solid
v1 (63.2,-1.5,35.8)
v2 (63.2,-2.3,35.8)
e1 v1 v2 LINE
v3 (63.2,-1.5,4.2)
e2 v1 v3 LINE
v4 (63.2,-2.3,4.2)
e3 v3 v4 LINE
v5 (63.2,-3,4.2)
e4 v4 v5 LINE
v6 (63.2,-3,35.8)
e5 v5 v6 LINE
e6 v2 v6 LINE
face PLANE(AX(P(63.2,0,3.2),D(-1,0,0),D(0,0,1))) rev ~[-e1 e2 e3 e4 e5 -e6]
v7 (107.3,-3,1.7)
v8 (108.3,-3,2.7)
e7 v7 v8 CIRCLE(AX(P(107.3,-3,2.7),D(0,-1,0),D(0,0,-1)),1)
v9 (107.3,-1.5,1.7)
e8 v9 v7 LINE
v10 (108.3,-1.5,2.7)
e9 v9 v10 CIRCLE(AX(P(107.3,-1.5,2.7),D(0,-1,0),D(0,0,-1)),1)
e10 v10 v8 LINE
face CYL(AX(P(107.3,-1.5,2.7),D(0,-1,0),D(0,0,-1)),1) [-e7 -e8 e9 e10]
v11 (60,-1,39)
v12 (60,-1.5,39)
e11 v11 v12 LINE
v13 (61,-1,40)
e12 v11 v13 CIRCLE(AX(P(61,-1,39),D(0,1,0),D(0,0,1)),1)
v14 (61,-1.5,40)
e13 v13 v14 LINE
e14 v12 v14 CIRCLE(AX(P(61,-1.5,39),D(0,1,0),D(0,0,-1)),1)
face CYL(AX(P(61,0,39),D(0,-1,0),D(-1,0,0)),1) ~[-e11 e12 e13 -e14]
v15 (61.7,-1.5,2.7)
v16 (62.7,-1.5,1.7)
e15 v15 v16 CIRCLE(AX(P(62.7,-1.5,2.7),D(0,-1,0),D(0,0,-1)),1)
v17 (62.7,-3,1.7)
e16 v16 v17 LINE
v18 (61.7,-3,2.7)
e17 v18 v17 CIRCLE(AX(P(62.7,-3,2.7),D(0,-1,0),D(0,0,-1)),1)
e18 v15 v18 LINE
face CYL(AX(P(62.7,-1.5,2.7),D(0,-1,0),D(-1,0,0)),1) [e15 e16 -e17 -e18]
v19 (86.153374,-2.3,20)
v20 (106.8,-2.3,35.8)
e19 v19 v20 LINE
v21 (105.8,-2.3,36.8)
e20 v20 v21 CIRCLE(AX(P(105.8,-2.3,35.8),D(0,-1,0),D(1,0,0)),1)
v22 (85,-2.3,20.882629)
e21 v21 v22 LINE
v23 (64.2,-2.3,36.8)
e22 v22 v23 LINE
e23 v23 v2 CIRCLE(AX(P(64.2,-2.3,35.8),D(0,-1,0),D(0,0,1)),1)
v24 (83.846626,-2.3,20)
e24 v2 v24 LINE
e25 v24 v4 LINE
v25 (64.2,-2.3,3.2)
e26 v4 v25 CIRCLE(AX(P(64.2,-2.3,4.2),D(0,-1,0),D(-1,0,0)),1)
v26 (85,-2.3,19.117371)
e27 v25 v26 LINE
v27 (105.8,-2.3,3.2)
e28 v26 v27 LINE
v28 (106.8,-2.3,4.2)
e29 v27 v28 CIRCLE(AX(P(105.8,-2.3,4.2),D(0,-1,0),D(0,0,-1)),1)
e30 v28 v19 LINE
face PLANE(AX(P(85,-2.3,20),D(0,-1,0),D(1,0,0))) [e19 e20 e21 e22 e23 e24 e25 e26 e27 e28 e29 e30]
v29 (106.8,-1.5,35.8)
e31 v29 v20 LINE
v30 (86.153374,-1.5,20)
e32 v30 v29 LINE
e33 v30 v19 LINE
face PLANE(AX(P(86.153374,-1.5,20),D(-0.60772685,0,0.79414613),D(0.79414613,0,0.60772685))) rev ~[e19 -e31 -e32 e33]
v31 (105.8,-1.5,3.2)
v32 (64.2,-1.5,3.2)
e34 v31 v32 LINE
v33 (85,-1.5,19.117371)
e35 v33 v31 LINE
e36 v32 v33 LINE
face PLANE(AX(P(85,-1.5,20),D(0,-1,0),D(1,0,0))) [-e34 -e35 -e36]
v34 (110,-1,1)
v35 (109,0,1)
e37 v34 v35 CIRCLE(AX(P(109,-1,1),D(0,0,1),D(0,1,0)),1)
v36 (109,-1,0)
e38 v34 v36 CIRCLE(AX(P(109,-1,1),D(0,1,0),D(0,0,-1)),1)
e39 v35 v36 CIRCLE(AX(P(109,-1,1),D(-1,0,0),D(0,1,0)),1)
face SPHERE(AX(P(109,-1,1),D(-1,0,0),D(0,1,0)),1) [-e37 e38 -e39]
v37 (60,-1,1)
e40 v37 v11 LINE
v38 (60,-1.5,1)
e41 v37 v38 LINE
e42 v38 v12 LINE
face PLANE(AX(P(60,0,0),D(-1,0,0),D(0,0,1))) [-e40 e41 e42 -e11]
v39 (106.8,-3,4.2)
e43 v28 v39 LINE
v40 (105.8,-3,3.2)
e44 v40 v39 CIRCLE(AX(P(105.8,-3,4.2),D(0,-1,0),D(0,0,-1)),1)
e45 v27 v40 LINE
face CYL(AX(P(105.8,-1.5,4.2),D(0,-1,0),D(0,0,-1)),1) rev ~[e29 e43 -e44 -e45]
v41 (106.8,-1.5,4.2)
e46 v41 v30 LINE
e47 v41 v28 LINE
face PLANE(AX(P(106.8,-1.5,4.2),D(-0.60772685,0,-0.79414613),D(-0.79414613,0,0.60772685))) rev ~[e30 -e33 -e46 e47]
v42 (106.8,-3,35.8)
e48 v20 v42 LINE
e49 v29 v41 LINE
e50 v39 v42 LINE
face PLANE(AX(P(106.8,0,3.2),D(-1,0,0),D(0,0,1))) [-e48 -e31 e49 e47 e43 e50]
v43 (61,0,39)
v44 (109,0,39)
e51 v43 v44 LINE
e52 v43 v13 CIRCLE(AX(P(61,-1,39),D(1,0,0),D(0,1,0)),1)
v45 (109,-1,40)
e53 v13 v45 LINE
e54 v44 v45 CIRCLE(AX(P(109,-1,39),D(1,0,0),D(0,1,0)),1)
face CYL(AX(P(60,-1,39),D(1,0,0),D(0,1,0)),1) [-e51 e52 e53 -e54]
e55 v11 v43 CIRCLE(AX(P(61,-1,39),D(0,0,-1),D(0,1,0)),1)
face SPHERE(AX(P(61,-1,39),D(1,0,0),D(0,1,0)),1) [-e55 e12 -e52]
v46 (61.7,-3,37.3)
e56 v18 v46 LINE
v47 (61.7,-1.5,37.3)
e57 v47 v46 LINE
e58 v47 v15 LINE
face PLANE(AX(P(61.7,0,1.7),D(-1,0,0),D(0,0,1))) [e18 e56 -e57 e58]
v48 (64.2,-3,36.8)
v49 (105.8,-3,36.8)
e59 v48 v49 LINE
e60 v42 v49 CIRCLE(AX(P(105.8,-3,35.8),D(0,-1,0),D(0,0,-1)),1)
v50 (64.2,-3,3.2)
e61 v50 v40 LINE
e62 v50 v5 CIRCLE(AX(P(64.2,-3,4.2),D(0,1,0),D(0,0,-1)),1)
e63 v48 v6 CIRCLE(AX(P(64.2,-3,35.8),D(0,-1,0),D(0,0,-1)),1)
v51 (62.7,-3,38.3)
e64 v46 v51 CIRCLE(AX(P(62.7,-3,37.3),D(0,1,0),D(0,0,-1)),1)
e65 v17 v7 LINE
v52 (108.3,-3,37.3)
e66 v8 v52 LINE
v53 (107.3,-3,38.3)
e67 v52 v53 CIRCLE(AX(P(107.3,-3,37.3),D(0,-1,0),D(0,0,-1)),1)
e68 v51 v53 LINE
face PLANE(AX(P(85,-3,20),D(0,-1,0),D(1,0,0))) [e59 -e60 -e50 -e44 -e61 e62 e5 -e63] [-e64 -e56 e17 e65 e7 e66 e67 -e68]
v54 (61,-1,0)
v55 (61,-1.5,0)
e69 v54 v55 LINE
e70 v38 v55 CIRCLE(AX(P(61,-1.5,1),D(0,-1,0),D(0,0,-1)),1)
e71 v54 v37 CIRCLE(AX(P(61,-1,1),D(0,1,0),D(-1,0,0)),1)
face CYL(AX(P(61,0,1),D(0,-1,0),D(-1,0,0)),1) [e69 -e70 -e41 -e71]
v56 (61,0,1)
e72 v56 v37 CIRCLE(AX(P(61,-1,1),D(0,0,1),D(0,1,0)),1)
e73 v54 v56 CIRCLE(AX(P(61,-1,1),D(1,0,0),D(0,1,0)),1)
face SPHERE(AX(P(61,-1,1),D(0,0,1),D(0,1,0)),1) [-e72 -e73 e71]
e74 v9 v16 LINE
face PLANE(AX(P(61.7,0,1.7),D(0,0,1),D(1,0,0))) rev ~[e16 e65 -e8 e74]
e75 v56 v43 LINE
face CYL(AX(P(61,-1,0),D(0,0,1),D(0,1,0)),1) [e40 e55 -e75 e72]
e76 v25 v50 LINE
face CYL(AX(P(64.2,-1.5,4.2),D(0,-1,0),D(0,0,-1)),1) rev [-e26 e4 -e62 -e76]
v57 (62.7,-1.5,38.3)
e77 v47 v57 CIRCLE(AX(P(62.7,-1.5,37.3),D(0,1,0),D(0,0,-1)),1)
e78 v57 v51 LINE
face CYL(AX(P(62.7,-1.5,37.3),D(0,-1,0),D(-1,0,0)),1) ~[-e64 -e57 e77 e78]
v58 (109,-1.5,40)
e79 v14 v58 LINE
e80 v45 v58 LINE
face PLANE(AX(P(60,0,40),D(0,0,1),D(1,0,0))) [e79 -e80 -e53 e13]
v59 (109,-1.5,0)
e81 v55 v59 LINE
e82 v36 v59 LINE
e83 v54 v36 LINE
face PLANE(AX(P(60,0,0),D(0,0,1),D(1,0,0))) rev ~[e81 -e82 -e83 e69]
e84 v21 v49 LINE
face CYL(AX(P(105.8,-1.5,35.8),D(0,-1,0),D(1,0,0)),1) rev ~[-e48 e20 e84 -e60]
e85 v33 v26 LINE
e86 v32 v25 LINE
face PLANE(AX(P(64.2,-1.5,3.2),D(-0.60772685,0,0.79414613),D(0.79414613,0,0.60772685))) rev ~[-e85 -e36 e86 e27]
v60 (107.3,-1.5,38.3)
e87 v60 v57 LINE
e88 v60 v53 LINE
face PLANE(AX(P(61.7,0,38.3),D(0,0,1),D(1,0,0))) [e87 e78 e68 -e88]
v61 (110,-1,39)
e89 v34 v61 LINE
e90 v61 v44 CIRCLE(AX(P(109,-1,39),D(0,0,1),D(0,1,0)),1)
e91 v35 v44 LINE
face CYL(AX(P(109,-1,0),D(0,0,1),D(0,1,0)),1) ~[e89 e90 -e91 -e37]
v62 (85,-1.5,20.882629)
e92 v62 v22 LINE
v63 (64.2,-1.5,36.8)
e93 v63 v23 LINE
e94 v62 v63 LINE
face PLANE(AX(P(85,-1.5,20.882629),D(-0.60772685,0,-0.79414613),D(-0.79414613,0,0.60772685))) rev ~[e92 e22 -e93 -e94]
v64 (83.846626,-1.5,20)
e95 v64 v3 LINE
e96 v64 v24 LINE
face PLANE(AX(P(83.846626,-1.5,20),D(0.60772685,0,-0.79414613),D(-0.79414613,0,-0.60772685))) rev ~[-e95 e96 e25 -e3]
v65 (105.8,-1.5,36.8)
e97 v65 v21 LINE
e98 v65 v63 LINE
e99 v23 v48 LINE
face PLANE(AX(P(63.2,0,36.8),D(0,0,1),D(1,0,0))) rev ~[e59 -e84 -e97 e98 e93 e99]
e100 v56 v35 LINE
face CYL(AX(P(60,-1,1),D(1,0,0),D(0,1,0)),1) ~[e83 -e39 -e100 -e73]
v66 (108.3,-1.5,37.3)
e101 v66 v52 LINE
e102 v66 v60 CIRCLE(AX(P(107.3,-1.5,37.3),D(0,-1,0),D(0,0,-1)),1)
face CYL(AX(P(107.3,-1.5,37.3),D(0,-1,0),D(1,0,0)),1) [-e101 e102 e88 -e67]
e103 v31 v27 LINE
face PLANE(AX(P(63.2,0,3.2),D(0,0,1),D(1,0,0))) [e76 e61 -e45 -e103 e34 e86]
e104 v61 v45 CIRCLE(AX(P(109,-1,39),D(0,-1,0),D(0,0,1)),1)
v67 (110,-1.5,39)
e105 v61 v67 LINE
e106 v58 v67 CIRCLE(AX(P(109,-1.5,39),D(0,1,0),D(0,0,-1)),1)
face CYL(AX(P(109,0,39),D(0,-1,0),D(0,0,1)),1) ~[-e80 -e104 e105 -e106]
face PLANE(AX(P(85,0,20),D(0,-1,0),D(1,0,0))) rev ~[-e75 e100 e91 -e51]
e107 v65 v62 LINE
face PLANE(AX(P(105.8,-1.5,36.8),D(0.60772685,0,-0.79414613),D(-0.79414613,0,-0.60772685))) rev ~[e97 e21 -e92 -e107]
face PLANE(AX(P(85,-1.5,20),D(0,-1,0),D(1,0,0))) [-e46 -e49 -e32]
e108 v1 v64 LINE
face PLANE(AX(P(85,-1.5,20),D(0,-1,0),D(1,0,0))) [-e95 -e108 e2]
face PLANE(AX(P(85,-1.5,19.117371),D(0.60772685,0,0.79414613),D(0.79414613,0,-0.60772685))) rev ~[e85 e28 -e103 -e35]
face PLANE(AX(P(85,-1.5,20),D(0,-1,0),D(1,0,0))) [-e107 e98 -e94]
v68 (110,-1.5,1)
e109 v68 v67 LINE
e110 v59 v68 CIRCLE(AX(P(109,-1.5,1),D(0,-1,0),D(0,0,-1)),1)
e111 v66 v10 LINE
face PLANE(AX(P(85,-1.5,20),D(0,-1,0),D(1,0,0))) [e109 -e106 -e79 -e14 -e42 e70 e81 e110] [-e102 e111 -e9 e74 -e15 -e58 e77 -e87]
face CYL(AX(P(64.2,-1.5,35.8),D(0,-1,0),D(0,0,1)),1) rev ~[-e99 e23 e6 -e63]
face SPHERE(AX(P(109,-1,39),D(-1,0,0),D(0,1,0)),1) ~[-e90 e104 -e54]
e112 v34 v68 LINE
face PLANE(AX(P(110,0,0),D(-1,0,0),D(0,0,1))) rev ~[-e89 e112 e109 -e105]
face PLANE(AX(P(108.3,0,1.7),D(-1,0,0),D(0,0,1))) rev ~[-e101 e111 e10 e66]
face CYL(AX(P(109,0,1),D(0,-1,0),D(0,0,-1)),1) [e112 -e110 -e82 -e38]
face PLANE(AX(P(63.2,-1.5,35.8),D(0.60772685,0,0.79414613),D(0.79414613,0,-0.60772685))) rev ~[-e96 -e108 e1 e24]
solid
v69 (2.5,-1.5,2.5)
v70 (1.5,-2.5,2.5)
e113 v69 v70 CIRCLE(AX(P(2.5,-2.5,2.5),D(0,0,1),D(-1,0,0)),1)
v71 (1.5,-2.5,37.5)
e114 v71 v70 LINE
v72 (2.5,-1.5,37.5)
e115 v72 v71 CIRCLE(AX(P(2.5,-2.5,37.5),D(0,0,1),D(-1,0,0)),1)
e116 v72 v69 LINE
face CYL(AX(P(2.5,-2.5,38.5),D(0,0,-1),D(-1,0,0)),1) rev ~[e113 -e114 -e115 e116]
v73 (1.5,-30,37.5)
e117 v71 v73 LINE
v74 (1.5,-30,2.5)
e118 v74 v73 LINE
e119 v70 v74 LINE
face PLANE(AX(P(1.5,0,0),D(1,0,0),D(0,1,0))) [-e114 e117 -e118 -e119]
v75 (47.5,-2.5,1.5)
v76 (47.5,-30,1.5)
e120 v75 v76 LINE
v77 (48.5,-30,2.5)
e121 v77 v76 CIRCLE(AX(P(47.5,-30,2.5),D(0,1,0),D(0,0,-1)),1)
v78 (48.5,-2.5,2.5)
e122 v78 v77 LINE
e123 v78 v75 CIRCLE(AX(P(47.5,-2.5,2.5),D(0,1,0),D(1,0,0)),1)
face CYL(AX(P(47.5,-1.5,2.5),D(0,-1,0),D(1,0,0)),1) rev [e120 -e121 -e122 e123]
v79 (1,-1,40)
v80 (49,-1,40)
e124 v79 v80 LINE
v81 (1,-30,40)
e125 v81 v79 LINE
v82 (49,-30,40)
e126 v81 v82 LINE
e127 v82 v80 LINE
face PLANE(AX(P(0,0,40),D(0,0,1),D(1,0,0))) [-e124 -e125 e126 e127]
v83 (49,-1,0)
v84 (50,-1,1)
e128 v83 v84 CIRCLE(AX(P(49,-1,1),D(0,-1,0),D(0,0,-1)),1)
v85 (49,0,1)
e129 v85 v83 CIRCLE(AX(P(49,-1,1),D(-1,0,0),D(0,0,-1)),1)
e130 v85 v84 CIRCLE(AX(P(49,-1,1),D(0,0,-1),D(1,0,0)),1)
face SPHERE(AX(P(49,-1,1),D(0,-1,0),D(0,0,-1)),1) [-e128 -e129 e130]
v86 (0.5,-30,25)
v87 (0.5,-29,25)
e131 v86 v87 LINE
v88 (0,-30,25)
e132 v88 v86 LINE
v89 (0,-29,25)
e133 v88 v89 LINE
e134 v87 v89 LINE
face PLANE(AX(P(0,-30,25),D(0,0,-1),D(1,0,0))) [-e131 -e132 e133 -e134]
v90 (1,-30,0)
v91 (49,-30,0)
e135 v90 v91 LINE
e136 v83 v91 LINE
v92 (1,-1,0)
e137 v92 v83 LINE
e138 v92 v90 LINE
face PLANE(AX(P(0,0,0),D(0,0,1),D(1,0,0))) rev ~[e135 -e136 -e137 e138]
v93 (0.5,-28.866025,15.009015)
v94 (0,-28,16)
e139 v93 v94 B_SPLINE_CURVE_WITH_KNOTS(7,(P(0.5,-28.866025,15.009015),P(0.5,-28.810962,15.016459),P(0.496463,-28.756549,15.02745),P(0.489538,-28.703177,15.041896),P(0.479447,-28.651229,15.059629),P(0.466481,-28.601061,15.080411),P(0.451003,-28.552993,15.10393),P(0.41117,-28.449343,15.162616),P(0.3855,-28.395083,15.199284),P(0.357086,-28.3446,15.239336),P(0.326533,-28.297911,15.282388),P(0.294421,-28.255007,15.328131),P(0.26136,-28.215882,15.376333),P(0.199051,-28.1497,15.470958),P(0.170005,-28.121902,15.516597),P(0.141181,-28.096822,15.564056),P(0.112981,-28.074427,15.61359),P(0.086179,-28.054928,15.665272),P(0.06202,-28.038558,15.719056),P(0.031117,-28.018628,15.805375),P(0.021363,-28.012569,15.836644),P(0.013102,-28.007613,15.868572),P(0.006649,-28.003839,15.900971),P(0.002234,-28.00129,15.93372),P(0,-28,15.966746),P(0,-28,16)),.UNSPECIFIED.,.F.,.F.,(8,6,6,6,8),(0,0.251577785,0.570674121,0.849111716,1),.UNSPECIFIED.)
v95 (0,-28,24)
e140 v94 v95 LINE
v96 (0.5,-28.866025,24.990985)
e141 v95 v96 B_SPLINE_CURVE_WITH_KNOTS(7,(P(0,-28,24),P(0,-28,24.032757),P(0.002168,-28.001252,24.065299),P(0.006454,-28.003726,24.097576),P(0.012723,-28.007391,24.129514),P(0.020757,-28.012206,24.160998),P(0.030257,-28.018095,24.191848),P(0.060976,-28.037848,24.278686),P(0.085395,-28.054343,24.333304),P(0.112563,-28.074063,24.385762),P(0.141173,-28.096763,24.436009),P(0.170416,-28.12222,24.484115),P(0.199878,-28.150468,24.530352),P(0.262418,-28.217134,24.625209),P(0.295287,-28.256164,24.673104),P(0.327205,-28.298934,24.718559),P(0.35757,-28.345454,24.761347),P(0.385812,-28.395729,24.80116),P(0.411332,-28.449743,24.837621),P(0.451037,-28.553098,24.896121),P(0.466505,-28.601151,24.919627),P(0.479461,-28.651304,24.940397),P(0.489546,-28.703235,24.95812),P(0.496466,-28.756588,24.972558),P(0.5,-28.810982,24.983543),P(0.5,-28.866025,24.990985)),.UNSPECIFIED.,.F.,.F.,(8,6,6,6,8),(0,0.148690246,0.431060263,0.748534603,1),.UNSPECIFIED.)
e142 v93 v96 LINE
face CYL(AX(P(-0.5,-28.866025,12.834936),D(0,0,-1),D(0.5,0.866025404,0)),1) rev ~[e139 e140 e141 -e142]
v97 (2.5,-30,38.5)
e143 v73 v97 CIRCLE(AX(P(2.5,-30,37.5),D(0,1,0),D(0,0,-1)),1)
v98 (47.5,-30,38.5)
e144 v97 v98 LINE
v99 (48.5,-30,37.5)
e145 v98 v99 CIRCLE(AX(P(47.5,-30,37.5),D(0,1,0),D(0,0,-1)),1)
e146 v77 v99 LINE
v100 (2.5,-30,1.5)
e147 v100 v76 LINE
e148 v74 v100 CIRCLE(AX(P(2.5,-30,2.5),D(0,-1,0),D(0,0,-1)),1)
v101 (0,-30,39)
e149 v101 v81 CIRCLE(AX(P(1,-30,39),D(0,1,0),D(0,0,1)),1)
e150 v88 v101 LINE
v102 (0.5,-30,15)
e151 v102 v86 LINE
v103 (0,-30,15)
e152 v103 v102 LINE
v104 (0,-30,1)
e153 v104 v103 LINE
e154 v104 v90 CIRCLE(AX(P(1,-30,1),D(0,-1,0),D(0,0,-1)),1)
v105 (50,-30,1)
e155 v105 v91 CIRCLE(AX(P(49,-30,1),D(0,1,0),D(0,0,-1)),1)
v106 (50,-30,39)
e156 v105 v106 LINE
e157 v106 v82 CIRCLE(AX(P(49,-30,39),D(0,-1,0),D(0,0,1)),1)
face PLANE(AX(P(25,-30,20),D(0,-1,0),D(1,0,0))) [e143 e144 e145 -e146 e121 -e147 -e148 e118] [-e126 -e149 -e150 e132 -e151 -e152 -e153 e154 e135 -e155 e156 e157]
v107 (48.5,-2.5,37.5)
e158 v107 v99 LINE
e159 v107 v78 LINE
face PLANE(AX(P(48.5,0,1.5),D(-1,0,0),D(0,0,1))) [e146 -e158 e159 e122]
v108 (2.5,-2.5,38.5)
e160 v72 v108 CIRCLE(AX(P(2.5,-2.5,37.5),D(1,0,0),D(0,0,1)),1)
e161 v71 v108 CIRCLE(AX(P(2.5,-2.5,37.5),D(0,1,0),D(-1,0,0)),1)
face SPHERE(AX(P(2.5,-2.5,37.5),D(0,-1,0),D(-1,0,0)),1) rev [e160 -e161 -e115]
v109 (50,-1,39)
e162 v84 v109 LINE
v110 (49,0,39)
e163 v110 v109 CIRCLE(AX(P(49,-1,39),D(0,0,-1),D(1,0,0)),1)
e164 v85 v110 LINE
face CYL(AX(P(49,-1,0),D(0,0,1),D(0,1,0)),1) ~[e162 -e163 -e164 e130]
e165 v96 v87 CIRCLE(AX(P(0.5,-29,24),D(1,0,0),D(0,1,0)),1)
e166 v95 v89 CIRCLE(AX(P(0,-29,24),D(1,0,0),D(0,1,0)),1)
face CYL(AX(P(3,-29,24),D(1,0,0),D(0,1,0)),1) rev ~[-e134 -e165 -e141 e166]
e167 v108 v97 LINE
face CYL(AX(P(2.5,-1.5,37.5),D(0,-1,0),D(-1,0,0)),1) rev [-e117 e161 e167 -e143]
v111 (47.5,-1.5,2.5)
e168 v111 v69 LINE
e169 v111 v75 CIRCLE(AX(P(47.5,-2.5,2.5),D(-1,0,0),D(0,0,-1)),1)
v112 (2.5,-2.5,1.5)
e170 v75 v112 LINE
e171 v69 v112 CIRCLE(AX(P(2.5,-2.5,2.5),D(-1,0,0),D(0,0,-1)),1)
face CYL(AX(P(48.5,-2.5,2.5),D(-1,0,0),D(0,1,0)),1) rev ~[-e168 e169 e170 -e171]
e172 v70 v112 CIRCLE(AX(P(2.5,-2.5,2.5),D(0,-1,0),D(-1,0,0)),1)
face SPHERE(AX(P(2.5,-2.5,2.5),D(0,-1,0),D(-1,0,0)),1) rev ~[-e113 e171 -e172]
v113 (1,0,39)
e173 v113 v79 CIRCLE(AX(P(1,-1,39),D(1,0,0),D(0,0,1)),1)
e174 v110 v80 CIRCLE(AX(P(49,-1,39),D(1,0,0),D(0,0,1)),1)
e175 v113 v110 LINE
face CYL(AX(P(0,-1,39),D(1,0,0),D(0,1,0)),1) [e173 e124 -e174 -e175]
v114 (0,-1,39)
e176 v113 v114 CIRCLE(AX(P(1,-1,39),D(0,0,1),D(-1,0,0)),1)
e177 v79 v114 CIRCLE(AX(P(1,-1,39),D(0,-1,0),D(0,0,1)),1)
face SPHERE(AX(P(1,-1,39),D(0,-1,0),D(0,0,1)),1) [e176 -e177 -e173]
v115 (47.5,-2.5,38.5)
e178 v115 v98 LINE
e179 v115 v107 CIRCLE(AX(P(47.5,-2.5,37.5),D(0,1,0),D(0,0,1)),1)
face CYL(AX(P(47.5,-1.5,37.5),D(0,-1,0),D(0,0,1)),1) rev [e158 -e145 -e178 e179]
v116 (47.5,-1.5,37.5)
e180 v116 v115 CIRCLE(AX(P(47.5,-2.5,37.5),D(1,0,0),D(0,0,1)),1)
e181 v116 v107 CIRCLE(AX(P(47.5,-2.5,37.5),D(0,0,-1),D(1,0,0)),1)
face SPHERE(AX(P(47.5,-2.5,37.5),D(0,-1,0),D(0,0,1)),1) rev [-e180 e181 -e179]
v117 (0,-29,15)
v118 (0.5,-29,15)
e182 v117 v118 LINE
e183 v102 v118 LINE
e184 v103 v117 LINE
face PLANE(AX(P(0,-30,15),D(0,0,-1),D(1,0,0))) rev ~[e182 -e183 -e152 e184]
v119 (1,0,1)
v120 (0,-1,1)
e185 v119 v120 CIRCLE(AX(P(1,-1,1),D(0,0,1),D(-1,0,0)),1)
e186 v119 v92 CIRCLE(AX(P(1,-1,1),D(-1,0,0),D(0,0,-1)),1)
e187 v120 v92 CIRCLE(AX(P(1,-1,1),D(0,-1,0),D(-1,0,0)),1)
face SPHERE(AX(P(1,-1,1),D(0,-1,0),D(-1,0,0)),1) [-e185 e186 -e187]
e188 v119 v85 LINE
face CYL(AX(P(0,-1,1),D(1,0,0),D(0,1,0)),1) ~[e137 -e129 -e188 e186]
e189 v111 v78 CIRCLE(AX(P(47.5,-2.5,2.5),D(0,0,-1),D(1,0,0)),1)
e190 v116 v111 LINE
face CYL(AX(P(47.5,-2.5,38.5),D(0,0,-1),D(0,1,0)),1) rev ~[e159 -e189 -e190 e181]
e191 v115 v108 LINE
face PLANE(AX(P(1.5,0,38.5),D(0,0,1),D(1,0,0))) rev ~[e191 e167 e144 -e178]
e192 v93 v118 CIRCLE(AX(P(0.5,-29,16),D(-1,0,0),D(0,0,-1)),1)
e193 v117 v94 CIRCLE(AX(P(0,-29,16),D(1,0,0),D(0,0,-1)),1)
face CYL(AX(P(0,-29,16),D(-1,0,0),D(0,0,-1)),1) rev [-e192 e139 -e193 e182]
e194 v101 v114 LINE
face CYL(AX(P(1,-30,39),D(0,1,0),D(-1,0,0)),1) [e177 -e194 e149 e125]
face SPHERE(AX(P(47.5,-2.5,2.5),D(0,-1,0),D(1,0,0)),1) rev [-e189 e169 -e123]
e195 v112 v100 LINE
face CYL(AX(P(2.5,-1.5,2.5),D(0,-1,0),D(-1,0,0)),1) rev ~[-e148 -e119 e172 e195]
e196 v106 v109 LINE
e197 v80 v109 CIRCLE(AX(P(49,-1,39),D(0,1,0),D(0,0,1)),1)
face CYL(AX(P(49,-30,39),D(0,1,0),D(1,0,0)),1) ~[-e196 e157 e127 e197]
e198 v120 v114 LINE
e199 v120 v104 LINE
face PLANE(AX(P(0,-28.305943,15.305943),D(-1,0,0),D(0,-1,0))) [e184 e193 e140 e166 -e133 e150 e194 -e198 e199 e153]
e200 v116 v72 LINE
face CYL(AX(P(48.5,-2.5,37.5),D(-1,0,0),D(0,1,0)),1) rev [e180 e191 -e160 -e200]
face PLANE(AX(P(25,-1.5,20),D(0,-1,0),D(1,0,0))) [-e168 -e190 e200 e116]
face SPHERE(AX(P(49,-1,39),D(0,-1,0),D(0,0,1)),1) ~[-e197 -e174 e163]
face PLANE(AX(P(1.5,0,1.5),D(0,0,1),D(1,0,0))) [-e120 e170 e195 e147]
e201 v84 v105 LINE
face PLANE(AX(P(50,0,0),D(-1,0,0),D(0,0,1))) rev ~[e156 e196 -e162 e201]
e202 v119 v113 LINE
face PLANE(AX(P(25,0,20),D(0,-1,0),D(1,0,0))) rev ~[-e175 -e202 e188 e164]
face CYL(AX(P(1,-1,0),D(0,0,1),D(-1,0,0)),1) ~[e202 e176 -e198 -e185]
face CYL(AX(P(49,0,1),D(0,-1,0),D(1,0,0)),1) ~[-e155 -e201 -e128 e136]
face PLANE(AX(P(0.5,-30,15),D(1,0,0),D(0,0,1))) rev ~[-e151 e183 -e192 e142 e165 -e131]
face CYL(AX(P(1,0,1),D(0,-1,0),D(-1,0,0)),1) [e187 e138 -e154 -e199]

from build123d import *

# Parameters (mm, degrees)
F0_W         = 50
F0_H         = 40
F0_W_2       = 47
F0_H_2       = 37
F1_DEPTH     = 1.5
F0_W_3       = 46.6
F0_H_3       = 36.6
F0_W_4       = 43.6
F0_H_4       = 33.6
F2_DEPTH     = 30
F3_DEPTH     = 3
F4_R         = 1
F4_2_R       = 1
F6_DEPTH     = 0.8
F7_W         = 0.5
F7_H         = 10
F8_DEPTH     = 2
F9_T1_DEPTH  = 14.3301270189
F9_T6_DEPTH  = 3
F9_T11_DEPTH = 3


# Not quite as in the source:
# - a fillet or chamfer that OpenCascade refuses, or shapes differently, is made with other operations: its cross-section is extruded or revolved along the edge and cut away or added


with BuildPart() as f1:
    # F0 (on Front) → F1 (new body)
    with BuildSketch(Plane.XZ):
        with Locations((25, 20)):
            Rectangle(F0_W, F0_H)
        with Locations((25, 20)):
            Rectangle(F0_W_2, F0_H_2, mode=Mode.SUBTRACT)
        with Locations((25, 20)):
            Rectangle(F0_W_2, F0_H_2)
    extrude(amount=F1_DEPTH)

    # F0 (on Front) → F2 (join)
    with BuildSketch(Plane.XZ):
        with Locations((25, 20)):
            Rectangle(F0_W, F0_H)
        with Locations((25, 20)):
            Rectangle(F0_W_2, F0_H_2, mode=Mode.SUBTRACT)
    extrude(amount=F2_DEPTH)

    # F4
    f4_edges = [f1.edges().sort_by_distance(p)[0] for p in [
        (50, -15, 0),
        (0, -15, 0),
        (0, -15, 40),
        (50, -15, 40),
        (25, 0, 40),
        (0, 0, 20),
        (25, 0, 0),
        (50, 0, 20),
        (48.5, -15.75, 38.5),
        (48.5, -15.75, 1.5),
        (1.5, -15.75, 38.5),
        (1.5, -15.75, 1.5),
        (1.5, -1.5, 20),
        (25, -1.5, 38.5),
        (48.5, -1.5, 20),
        (25, -1.5, 1.5),
    ]]
    fillet(f4_edges, radius=F4_R)

    # F7 (on face) → F8 (cut)
    with BuildSketch(Plane.XZ.offset(30)):
        with Locations((0.25, 20)):
            Rectangle(F7_W, F7_H)
    extrude(amount=-F8_DEPTH, mode=Mode.SUBTRACT)

    # F9: fillet of radius 1 on 3 edges, made by hand

    # F9_s2 → F9_t1 (join)
    with BuildSketch(Plane.XY.offset(12.8349364905)):
        with BuildLine():
            ThreePointArc((0, -28), (0.3660254038, -28.3660254038), (0.5, -28.8660254038))
            Line((0.5, -28.8660254038), (0.5, -28))
            Line((0.5, -28), (0, -28))
        make_face()
    extrude(amount=F9_T1_DEPTH)


with BuildPart() as f1b:
    # F0 (on Front) → F1, piece 2 (new body)
    with BuildSketch(Plane.XZ):
        with Locations((85, 20)):
            Rectangle(F0_W, F0_H)
        with Locations((85, 20)):
            Rectangle(F0_W_3, F0_H_3, mode=Mode.SUBTRACT)
        with Locations((85, 20)):
            Rectangle(F0_W_3, F0_H_3)
        with Locations((85, 20)):
            Rectangle(F0_W_4, F0_H_4, mode=Mode.SUBTRACT)
        with Locations((85, 20)):
            Rectangle(F0_W_4, F0_H_4)
    extrude(amount=F1_DEPTH)

    # F0 (on Front) → F3 (join)
    with BuildSketch(Plane.XZ):
        with Locations((85, 20)):
            Rectangle(F0_W_3, F0_H_3)
        with Locations((85, 20)):
            Rectangle(F0_W_4, F0_H_4, mode=Mode.SUBTRACT)
    extrude(amount=F3_DEPTH)

    # F4#2
    f4_2_edges = [f1b.edges().sort_by_distance(p)[0] for p in [
        (85, 0, 40),
        (60, 0, 20),
        (85, 0, 0),
        (110, 0, 20),
        (60, -0.75, 0),
        (60, -0.75, 40),
        (110, -0.75, 40),
        (110, -0.75, 0),
        (61.7, -2.25, 1.7),
        (108.3, -2.25, 1.7),
        (108.3, -2.25, 38.3),
        (61.7, -2.25, 38.3),
        (63.2, -2.25, 36.8),
        (106.8, -2.25, 36.8),
        (106.8, -2.25, 3.2),
        (63.2, -2.25, 3.2),
    ]]
    fillet(f4_2_edges, radius=F4_2_R)

    # F5 (on face) → F6 (join)
    with BuildSketch(Plane.XZ.offset(1.5)):
        Polygon((85, 20.882629108), (83.8466257669, 20), (85, 19.117370892), (86.1533742331, 20), align=None)
        with BuildLine():
            Line((63.2, 35.8), (83.8466257669, 20))
            Line((83.8466257669, 20), (85, 20.882629108))
            Line((85, 20.882629108), (64.2, 36.8))
            ThreePointArc((64.2, 36.8), (63.4928932188, 36.5071067812), (63.2, 35.8))
        make_face()
        with BuildLine():
            Line((83.8466257669, 20), (63.2, 4.2))
            ThreePointArc((63.2, 4.2), (63.4928932188, 3.4928932188), (64.2, 3.2))
            Line((64.2, 3.2), (85, 19.117370892))
            Line((85, 19.117370892), (83.8466257669, 20))
        make_face()
        with BuildLine():
            Line((105.8, 36.8), (85, 20.882629108))
            Line((85, 20.882629108), (86.1533742331, 20))
            Line((86.1533742331, 20), (106.8, 35.8))
            ThreePointArc((106.8, 35.8), (106.5071067812, 36.5071067812), (105.8, 36.8))
        make_face()
        with BuildLine():
            Line((86.1533742331, 20), (85, 19.117370892))
            Line((85, 19.117370892), (105.8, 3.2))
            ThreePointArc((105.8, 3.2), (106.5071067812, 3.4928932188), (106.8, 4.2))
            Line((106.8, 4.2), (86.1533742331, 20))
        make_face()
    extrude(amount=F6_DEPTH)


with BuildPart() as f9_tool4:
    # F9_s5 → F9_t6 (new body)
    with BuildSketch(Plane.YZ):
        with BuildLine():
            ThreePointArc((-29, 15), (-28.2928932188, 15.2928932188), (-28, 16))
            Line((-28, 16), (-28, 15))
            Line((-28, 15), (-29, 15))
        make_face()
    extrude(amount=F9_T6_DEPTH)

    split(bisect_by=Plane.YZ.offset(1.5), keep=Keep.BOTTOM)


with BuildPart() as f1_1:
    add(f1.part)

    # F9_t3: union F9_tool4
    add(f9_tool4.part)


with BuildPart() as f9_tool9:
    # F9_s10 → F9_t11 (new body)
    with BuildSketch(Plane.YZ.offset(3)):
        with BuildLine():
            ThreePointArc((-28, 24), (-28.2928932188, 24.7071067812), (-29, 25))
            Line((-29, 25), (-28, 25))
            Line((-28, 25), (-28, 24))
        make_face()
    extrude(amount=-F9_T11_DEPTH)

    split(bisect_by=Plane.YZ.offset(1.5), keep=Keep.BOTTOM)


with BuildPart() as f1_2:
    add(f1_1.part)

    # F9_t8: union F9_tool9
    add(f9_tool9.part)


solid = Compound([f1b.part, f1_2.part])
